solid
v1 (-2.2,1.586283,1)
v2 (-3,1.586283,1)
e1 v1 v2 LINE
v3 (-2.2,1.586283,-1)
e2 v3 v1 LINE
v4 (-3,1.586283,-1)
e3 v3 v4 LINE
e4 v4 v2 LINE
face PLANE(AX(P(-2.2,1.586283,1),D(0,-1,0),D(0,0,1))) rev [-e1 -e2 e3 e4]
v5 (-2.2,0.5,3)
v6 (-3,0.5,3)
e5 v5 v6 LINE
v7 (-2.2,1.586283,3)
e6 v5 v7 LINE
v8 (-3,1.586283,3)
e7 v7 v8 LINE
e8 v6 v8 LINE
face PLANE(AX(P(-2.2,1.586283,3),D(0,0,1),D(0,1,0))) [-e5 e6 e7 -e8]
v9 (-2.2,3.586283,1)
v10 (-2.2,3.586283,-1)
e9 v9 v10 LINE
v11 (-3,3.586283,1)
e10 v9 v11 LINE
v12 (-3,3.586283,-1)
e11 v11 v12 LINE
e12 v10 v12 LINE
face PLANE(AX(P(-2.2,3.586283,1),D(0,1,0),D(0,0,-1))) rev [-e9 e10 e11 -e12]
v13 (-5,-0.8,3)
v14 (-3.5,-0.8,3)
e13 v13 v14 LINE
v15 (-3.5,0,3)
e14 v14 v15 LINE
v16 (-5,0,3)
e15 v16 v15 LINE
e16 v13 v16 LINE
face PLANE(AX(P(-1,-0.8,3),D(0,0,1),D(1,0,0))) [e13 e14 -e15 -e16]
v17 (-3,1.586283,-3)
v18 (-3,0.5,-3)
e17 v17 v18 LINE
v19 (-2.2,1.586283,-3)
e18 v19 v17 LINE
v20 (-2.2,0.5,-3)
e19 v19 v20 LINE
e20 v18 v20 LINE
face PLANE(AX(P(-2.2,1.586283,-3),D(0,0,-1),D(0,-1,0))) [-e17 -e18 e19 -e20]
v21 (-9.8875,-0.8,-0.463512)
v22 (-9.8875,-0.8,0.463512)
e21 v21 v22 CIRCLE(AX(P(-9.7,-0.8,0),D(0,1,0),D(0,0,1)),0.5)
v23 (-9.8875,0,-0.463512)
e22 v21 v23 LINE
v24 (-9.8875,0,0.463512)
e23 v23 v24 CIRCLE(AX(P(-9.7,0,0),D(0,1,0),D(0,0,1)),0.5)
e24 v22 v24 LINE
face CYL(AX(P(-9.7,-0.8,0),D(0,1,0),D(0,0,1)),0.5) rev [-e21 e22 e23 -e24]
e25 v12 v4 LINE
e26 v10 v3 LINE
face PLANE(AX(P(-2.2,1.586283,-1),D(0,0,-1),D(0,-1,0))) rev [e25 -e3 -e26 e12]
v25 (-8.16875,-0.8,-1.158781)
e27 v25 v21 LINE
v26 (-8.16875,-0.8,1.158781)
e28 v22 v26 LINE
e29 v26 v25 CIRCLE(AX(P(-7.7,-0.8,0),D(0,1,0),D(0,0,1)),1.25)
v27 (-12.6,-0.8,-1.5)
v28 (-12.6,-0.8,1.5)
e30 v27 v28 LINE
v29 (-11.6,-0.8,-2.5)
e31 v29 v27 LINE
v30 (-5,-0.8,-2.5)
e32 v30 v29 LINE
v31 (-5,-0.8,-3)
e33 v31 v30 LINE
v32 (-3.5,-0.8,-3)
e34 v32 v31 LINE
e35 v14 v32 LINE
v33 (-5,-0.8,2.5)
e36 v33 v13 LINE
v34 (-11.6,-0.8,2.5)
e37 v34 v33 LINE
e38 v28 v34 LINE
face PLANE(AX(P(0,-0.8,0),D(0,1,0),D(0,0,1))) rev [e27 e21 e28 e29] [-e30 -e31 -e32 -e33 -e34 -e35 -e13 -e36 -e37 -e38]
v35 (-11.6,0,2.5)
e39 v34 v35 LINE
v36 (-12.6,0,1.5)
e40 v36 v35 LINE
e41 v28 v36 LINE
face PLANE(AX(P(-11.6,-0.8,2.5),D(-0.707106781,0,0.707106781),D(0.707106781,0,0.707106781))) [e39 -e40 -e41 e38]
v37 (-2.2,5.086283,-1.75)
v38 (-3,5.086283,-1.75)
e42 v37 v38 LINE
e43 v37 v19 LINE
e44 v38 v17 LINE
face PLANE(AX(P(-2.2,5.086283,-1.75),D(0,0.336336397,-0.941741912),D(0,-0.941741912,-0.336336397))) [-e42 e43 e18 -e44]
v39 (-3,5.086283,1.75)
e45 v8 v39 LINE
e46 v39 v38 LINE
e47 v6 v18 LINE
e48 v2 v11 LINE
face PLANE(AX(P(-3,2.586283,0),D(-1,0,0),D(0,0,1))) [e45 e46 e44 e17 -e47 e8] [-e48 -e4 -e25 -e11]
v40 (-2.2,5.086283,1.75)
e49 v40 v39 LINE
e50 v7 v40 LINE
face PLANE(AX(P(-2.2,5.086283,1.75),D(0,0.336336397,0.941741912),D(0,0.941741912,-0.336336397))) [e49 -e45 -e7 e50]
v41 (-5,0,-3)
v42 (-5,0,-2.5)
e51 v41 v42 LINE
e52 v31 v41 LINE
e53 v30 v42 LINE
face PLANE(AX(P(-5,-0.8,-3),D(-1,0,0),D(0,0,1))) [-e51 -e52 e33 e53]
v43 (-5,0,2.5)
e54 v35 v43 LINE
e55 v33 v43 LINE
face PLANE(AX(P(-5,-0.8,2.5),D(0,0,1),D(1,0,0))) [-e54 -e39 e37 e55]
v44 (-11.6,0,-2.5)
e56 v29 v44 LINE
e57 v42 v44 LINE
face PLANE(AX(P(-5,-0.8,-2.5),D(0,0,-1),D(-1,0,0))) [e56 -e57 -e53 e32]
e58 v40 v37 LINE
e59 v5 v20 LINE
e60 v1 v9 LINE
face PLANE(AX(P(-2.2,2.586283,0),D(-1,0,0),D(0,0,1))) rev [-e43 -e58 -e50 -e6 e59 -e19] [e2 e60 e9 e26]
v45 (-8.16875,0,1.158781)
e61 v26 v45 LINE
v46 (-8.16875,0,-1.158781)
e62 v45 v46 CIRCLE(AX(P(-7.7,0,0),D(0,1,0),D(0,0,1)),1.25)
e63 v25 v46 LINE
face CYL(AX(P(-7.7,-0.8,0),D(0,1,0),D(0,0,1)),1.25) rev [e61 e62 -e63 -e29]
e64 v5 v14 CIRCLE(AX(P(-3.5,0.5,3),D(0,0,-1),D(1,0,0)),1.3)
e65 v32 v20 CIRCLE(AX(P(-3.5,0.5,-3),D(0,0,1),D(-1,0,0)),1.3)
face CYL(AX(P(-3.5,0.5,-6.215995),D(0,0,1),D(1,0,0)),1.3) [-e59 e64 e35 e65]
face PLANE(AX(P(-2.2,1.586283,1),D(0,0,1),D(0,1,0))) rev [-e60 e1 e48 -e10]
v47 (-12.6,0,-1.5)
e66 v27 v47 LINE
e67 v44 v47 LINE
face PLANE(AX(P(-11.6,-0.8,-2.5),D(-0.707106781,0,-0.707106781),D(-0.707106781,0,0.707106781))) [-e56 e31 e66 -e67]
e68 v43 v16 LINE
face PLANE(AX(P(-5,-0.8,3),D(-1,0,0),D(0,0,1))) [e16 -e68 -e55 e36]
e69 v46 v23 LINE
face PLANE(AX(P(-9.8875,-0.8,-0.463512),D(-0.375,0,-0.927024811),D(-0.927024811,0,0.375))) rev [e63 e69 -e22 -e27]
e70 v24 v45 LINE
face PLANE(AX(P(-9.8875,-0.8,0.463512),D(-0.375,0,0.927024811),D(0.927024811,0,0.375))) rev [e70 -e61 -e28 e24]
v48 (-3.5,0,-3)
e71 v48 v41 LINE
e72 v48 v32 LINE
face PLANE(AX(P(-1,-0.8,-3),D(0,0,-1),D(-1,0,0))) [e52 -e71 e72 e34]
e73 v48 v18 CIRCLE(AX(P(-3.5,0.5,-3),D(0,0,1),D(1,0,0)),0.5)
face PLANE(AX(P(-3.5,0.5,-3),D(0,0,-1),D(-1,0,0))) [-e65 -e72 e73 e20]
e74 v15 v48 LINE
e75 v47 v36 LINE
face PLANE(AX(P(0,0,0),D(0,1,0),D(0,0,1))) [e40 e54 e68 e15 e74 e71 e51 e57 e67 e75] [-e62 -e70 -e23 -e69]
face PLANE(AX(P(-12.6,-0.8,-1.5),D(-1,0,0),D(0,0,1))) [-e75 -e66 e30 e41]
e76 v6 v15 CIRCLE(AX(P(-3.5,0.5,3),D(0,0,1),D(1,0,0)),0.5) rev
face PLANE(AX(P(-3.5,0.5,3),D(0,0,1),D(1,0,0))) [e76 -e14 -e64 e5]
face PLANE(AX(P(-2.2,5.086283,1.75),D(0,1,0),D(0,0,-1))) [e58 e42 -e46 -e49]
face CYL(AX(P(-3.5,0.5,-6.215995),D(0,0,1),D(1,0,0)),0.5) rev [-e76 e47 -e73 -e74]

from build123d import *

# Parameters (mm, degrees)
SKETCH_1_W             = 2
SKETCH_1_H             = 2
SM_BASE_FLANGE_1_DEPTH = 0.8
OTHER_START            = -3
OTHER_2_DEPTH          = 6
OTHER_START_2          = -1.75
OTHER_2_2_OUTLINE_W    = 0.8
OTHER_2_2_OUTLINE_H    = 1.5
OTHER_2_2_DEPTH        = 3.5
OTHER_2_3_DEPTH        = 6
OTHER_2_4_OUTLINE_W    = 0.8
OTHER_2_4_OUTLINE_H    = 2
OTHER_2_4_DEPTH        = 0.75
OTHER_START_3          = 1
OTHER_2_5_OUTLINE_W    = 0.8
OTHER_2_5_OUTLINE_H    = 2
OTHER_2_5_DEPTH        = 0.75
OTHER_2_6_DEPTH        = 0.8


with BuildPart() as part:
    # Базовая кромка1: sheet metal written as solids
    # Sketch 1 → Базовая кромка1 (new body)
    with BuildSketch(Plane(origin=(0, 0, 0), x_dir=(1, 0, 0), z_dir=(0, 1, 0))):
        Polygon((2.5, -1.75), (2.5, 1.75), (-1, 3), (-5, 3), (-5, 2.5), (-11.6, 2.5), (-12.6, 1.5), (-12.6, -1.5), (-11.6, -2.5), (-5, -2.5), (-5, -3), (-1, -3), align=None)
        with BuildLine():
            Line((-9.8875, 0.463512405), (-8.16875, 1.158781014))
            ThreePointArc((-8.16875, 1.158781014), (-6.45, 0), (-8.16875, -1.158781014))
            Line((-8.16875, -1.158781014), (-9.8875, -0.463512405))
            ThreePointArc((-9.8875, -0.463512405), (-10.2, 0), (-9.8875, 0.463512405))
        make_face(mode=Mode.SUBTRACT)
        Rectangle(SKETCH_1_W, SKETCH_1_H, mode=Mode.SUBTRACT)
    extrude(amount=-SM_BASE_FLANGE_1_DEPTH)

    # Other 2: read off the stored shape, not the designer's step
    # Other 2 outline → Other 2 (cut)
    with BuildSketch(Plane.XY.offset(OTHER_START)):
        with BuildLine():
            ThreePointArc((-2.299999999, 0), (-2.778889744, -0.581665383), (-3.5, -0.8))
            Line((-3.5, -0.8), (2.5, -0.8))
            Line((2.5, -0.8), (2.5, 0))
            Line((2.5, 0), (-2.299999999, 0))
        make_face()
    extrude(amount=OTHER_2_DEPTH, mode=Mode.SUBTRACT)

    # Other 2 2 outline → Other 2 2 (add)
    with BuildSketch(Plane.XY.offset(OTHER_START_2)):
        with Locations((-2.6, 4.336283306)):
            Rectangle(OTHER_2_2_OUTLINE_W, OTHER_2_2_OUTLINE_H)
        with BuildLine():
            Line((-2.2, 0.5), (-2.2, 1.586283306))
            Line((-2.2, 1.586283306), (-3, 1.586283306))
            Line((-3, 1.586283306), (-3, 0.5))
            ThreePointArc((-3, 0.5), (-3.146446609, 0.146446609), (-3.5, 0))
            Line((-3.5, 0), (-2.299999999, 0))
            ThreePointArc((-2.299999999, 0), (-2.225245121, 0.245049024), (-2.2, 0.5))
        make_face()
    extrude(amount=OTHER_2_2_DEPTH)

    # Other 2 3 outline → Other 2 3 (add)
    with BuildSketch(Plane.XY.offset(OTHER_START)):
        with BuildLine():
            Line((-2.2, 0.5), (-2.2, 1.586283306))
            Line((-2.2, 1.586283306), (-3, 1.586283306))
            Line((-3, 1.586283306), (-3, 0.5))
            ThreePointArc((-3, 0.5), (-3.146446609, 0.146446609), (-3.5, 0))
            Line((-3.5, 0), (-2.299999999, 0))
            ThreePointArc((-2.299999999, 0), (-2.225245121, 0.245049024), (-2.2, 0.5))
        make_face()
    extrude(amount=OTHER_2_3_DEPTH)

    # Other 2 4 outline → Other 2 4 (add)
    with BuildSketch(Plane.XY.offset(OTHER_START_2)):
        with Locations((-2.6, 2.586283306)):
            Rectangle(OTHER_2_4_OUTLINE_W, OTHER_2_4_OUTLINE_H)
    extrude(amount=OTHER_2_4_DEPTH)

    # Other 2 5 outline → Other 2 5 (add)
    with BuildSketch(Plane.XY.offset(OTHER_START_3)):
        with Locations((-2.6, 2.586283306)):
            Rectangle(OTHER_2_5_OUTLINE_W, OTHER_2_5_OUTLINE_H)
    extrude(amount=OTHER_2_5_DEPTH)

    # Other 2 6 outline → Other 2 6 (add)
    with BuildSketch(Plane.YZ.offset(OTHER_START)):
        Polygon((1.586283306, -1.75), (1.586283306, -3), (5.086283306, -1.75), align=None)
        Polygon((1.586283306, 1.75), (5.086283306, 1.75), (1.586283306, 3), align=None)
    extrude(amount=OTHER_2_6_DEPTH)


solid = part.part
